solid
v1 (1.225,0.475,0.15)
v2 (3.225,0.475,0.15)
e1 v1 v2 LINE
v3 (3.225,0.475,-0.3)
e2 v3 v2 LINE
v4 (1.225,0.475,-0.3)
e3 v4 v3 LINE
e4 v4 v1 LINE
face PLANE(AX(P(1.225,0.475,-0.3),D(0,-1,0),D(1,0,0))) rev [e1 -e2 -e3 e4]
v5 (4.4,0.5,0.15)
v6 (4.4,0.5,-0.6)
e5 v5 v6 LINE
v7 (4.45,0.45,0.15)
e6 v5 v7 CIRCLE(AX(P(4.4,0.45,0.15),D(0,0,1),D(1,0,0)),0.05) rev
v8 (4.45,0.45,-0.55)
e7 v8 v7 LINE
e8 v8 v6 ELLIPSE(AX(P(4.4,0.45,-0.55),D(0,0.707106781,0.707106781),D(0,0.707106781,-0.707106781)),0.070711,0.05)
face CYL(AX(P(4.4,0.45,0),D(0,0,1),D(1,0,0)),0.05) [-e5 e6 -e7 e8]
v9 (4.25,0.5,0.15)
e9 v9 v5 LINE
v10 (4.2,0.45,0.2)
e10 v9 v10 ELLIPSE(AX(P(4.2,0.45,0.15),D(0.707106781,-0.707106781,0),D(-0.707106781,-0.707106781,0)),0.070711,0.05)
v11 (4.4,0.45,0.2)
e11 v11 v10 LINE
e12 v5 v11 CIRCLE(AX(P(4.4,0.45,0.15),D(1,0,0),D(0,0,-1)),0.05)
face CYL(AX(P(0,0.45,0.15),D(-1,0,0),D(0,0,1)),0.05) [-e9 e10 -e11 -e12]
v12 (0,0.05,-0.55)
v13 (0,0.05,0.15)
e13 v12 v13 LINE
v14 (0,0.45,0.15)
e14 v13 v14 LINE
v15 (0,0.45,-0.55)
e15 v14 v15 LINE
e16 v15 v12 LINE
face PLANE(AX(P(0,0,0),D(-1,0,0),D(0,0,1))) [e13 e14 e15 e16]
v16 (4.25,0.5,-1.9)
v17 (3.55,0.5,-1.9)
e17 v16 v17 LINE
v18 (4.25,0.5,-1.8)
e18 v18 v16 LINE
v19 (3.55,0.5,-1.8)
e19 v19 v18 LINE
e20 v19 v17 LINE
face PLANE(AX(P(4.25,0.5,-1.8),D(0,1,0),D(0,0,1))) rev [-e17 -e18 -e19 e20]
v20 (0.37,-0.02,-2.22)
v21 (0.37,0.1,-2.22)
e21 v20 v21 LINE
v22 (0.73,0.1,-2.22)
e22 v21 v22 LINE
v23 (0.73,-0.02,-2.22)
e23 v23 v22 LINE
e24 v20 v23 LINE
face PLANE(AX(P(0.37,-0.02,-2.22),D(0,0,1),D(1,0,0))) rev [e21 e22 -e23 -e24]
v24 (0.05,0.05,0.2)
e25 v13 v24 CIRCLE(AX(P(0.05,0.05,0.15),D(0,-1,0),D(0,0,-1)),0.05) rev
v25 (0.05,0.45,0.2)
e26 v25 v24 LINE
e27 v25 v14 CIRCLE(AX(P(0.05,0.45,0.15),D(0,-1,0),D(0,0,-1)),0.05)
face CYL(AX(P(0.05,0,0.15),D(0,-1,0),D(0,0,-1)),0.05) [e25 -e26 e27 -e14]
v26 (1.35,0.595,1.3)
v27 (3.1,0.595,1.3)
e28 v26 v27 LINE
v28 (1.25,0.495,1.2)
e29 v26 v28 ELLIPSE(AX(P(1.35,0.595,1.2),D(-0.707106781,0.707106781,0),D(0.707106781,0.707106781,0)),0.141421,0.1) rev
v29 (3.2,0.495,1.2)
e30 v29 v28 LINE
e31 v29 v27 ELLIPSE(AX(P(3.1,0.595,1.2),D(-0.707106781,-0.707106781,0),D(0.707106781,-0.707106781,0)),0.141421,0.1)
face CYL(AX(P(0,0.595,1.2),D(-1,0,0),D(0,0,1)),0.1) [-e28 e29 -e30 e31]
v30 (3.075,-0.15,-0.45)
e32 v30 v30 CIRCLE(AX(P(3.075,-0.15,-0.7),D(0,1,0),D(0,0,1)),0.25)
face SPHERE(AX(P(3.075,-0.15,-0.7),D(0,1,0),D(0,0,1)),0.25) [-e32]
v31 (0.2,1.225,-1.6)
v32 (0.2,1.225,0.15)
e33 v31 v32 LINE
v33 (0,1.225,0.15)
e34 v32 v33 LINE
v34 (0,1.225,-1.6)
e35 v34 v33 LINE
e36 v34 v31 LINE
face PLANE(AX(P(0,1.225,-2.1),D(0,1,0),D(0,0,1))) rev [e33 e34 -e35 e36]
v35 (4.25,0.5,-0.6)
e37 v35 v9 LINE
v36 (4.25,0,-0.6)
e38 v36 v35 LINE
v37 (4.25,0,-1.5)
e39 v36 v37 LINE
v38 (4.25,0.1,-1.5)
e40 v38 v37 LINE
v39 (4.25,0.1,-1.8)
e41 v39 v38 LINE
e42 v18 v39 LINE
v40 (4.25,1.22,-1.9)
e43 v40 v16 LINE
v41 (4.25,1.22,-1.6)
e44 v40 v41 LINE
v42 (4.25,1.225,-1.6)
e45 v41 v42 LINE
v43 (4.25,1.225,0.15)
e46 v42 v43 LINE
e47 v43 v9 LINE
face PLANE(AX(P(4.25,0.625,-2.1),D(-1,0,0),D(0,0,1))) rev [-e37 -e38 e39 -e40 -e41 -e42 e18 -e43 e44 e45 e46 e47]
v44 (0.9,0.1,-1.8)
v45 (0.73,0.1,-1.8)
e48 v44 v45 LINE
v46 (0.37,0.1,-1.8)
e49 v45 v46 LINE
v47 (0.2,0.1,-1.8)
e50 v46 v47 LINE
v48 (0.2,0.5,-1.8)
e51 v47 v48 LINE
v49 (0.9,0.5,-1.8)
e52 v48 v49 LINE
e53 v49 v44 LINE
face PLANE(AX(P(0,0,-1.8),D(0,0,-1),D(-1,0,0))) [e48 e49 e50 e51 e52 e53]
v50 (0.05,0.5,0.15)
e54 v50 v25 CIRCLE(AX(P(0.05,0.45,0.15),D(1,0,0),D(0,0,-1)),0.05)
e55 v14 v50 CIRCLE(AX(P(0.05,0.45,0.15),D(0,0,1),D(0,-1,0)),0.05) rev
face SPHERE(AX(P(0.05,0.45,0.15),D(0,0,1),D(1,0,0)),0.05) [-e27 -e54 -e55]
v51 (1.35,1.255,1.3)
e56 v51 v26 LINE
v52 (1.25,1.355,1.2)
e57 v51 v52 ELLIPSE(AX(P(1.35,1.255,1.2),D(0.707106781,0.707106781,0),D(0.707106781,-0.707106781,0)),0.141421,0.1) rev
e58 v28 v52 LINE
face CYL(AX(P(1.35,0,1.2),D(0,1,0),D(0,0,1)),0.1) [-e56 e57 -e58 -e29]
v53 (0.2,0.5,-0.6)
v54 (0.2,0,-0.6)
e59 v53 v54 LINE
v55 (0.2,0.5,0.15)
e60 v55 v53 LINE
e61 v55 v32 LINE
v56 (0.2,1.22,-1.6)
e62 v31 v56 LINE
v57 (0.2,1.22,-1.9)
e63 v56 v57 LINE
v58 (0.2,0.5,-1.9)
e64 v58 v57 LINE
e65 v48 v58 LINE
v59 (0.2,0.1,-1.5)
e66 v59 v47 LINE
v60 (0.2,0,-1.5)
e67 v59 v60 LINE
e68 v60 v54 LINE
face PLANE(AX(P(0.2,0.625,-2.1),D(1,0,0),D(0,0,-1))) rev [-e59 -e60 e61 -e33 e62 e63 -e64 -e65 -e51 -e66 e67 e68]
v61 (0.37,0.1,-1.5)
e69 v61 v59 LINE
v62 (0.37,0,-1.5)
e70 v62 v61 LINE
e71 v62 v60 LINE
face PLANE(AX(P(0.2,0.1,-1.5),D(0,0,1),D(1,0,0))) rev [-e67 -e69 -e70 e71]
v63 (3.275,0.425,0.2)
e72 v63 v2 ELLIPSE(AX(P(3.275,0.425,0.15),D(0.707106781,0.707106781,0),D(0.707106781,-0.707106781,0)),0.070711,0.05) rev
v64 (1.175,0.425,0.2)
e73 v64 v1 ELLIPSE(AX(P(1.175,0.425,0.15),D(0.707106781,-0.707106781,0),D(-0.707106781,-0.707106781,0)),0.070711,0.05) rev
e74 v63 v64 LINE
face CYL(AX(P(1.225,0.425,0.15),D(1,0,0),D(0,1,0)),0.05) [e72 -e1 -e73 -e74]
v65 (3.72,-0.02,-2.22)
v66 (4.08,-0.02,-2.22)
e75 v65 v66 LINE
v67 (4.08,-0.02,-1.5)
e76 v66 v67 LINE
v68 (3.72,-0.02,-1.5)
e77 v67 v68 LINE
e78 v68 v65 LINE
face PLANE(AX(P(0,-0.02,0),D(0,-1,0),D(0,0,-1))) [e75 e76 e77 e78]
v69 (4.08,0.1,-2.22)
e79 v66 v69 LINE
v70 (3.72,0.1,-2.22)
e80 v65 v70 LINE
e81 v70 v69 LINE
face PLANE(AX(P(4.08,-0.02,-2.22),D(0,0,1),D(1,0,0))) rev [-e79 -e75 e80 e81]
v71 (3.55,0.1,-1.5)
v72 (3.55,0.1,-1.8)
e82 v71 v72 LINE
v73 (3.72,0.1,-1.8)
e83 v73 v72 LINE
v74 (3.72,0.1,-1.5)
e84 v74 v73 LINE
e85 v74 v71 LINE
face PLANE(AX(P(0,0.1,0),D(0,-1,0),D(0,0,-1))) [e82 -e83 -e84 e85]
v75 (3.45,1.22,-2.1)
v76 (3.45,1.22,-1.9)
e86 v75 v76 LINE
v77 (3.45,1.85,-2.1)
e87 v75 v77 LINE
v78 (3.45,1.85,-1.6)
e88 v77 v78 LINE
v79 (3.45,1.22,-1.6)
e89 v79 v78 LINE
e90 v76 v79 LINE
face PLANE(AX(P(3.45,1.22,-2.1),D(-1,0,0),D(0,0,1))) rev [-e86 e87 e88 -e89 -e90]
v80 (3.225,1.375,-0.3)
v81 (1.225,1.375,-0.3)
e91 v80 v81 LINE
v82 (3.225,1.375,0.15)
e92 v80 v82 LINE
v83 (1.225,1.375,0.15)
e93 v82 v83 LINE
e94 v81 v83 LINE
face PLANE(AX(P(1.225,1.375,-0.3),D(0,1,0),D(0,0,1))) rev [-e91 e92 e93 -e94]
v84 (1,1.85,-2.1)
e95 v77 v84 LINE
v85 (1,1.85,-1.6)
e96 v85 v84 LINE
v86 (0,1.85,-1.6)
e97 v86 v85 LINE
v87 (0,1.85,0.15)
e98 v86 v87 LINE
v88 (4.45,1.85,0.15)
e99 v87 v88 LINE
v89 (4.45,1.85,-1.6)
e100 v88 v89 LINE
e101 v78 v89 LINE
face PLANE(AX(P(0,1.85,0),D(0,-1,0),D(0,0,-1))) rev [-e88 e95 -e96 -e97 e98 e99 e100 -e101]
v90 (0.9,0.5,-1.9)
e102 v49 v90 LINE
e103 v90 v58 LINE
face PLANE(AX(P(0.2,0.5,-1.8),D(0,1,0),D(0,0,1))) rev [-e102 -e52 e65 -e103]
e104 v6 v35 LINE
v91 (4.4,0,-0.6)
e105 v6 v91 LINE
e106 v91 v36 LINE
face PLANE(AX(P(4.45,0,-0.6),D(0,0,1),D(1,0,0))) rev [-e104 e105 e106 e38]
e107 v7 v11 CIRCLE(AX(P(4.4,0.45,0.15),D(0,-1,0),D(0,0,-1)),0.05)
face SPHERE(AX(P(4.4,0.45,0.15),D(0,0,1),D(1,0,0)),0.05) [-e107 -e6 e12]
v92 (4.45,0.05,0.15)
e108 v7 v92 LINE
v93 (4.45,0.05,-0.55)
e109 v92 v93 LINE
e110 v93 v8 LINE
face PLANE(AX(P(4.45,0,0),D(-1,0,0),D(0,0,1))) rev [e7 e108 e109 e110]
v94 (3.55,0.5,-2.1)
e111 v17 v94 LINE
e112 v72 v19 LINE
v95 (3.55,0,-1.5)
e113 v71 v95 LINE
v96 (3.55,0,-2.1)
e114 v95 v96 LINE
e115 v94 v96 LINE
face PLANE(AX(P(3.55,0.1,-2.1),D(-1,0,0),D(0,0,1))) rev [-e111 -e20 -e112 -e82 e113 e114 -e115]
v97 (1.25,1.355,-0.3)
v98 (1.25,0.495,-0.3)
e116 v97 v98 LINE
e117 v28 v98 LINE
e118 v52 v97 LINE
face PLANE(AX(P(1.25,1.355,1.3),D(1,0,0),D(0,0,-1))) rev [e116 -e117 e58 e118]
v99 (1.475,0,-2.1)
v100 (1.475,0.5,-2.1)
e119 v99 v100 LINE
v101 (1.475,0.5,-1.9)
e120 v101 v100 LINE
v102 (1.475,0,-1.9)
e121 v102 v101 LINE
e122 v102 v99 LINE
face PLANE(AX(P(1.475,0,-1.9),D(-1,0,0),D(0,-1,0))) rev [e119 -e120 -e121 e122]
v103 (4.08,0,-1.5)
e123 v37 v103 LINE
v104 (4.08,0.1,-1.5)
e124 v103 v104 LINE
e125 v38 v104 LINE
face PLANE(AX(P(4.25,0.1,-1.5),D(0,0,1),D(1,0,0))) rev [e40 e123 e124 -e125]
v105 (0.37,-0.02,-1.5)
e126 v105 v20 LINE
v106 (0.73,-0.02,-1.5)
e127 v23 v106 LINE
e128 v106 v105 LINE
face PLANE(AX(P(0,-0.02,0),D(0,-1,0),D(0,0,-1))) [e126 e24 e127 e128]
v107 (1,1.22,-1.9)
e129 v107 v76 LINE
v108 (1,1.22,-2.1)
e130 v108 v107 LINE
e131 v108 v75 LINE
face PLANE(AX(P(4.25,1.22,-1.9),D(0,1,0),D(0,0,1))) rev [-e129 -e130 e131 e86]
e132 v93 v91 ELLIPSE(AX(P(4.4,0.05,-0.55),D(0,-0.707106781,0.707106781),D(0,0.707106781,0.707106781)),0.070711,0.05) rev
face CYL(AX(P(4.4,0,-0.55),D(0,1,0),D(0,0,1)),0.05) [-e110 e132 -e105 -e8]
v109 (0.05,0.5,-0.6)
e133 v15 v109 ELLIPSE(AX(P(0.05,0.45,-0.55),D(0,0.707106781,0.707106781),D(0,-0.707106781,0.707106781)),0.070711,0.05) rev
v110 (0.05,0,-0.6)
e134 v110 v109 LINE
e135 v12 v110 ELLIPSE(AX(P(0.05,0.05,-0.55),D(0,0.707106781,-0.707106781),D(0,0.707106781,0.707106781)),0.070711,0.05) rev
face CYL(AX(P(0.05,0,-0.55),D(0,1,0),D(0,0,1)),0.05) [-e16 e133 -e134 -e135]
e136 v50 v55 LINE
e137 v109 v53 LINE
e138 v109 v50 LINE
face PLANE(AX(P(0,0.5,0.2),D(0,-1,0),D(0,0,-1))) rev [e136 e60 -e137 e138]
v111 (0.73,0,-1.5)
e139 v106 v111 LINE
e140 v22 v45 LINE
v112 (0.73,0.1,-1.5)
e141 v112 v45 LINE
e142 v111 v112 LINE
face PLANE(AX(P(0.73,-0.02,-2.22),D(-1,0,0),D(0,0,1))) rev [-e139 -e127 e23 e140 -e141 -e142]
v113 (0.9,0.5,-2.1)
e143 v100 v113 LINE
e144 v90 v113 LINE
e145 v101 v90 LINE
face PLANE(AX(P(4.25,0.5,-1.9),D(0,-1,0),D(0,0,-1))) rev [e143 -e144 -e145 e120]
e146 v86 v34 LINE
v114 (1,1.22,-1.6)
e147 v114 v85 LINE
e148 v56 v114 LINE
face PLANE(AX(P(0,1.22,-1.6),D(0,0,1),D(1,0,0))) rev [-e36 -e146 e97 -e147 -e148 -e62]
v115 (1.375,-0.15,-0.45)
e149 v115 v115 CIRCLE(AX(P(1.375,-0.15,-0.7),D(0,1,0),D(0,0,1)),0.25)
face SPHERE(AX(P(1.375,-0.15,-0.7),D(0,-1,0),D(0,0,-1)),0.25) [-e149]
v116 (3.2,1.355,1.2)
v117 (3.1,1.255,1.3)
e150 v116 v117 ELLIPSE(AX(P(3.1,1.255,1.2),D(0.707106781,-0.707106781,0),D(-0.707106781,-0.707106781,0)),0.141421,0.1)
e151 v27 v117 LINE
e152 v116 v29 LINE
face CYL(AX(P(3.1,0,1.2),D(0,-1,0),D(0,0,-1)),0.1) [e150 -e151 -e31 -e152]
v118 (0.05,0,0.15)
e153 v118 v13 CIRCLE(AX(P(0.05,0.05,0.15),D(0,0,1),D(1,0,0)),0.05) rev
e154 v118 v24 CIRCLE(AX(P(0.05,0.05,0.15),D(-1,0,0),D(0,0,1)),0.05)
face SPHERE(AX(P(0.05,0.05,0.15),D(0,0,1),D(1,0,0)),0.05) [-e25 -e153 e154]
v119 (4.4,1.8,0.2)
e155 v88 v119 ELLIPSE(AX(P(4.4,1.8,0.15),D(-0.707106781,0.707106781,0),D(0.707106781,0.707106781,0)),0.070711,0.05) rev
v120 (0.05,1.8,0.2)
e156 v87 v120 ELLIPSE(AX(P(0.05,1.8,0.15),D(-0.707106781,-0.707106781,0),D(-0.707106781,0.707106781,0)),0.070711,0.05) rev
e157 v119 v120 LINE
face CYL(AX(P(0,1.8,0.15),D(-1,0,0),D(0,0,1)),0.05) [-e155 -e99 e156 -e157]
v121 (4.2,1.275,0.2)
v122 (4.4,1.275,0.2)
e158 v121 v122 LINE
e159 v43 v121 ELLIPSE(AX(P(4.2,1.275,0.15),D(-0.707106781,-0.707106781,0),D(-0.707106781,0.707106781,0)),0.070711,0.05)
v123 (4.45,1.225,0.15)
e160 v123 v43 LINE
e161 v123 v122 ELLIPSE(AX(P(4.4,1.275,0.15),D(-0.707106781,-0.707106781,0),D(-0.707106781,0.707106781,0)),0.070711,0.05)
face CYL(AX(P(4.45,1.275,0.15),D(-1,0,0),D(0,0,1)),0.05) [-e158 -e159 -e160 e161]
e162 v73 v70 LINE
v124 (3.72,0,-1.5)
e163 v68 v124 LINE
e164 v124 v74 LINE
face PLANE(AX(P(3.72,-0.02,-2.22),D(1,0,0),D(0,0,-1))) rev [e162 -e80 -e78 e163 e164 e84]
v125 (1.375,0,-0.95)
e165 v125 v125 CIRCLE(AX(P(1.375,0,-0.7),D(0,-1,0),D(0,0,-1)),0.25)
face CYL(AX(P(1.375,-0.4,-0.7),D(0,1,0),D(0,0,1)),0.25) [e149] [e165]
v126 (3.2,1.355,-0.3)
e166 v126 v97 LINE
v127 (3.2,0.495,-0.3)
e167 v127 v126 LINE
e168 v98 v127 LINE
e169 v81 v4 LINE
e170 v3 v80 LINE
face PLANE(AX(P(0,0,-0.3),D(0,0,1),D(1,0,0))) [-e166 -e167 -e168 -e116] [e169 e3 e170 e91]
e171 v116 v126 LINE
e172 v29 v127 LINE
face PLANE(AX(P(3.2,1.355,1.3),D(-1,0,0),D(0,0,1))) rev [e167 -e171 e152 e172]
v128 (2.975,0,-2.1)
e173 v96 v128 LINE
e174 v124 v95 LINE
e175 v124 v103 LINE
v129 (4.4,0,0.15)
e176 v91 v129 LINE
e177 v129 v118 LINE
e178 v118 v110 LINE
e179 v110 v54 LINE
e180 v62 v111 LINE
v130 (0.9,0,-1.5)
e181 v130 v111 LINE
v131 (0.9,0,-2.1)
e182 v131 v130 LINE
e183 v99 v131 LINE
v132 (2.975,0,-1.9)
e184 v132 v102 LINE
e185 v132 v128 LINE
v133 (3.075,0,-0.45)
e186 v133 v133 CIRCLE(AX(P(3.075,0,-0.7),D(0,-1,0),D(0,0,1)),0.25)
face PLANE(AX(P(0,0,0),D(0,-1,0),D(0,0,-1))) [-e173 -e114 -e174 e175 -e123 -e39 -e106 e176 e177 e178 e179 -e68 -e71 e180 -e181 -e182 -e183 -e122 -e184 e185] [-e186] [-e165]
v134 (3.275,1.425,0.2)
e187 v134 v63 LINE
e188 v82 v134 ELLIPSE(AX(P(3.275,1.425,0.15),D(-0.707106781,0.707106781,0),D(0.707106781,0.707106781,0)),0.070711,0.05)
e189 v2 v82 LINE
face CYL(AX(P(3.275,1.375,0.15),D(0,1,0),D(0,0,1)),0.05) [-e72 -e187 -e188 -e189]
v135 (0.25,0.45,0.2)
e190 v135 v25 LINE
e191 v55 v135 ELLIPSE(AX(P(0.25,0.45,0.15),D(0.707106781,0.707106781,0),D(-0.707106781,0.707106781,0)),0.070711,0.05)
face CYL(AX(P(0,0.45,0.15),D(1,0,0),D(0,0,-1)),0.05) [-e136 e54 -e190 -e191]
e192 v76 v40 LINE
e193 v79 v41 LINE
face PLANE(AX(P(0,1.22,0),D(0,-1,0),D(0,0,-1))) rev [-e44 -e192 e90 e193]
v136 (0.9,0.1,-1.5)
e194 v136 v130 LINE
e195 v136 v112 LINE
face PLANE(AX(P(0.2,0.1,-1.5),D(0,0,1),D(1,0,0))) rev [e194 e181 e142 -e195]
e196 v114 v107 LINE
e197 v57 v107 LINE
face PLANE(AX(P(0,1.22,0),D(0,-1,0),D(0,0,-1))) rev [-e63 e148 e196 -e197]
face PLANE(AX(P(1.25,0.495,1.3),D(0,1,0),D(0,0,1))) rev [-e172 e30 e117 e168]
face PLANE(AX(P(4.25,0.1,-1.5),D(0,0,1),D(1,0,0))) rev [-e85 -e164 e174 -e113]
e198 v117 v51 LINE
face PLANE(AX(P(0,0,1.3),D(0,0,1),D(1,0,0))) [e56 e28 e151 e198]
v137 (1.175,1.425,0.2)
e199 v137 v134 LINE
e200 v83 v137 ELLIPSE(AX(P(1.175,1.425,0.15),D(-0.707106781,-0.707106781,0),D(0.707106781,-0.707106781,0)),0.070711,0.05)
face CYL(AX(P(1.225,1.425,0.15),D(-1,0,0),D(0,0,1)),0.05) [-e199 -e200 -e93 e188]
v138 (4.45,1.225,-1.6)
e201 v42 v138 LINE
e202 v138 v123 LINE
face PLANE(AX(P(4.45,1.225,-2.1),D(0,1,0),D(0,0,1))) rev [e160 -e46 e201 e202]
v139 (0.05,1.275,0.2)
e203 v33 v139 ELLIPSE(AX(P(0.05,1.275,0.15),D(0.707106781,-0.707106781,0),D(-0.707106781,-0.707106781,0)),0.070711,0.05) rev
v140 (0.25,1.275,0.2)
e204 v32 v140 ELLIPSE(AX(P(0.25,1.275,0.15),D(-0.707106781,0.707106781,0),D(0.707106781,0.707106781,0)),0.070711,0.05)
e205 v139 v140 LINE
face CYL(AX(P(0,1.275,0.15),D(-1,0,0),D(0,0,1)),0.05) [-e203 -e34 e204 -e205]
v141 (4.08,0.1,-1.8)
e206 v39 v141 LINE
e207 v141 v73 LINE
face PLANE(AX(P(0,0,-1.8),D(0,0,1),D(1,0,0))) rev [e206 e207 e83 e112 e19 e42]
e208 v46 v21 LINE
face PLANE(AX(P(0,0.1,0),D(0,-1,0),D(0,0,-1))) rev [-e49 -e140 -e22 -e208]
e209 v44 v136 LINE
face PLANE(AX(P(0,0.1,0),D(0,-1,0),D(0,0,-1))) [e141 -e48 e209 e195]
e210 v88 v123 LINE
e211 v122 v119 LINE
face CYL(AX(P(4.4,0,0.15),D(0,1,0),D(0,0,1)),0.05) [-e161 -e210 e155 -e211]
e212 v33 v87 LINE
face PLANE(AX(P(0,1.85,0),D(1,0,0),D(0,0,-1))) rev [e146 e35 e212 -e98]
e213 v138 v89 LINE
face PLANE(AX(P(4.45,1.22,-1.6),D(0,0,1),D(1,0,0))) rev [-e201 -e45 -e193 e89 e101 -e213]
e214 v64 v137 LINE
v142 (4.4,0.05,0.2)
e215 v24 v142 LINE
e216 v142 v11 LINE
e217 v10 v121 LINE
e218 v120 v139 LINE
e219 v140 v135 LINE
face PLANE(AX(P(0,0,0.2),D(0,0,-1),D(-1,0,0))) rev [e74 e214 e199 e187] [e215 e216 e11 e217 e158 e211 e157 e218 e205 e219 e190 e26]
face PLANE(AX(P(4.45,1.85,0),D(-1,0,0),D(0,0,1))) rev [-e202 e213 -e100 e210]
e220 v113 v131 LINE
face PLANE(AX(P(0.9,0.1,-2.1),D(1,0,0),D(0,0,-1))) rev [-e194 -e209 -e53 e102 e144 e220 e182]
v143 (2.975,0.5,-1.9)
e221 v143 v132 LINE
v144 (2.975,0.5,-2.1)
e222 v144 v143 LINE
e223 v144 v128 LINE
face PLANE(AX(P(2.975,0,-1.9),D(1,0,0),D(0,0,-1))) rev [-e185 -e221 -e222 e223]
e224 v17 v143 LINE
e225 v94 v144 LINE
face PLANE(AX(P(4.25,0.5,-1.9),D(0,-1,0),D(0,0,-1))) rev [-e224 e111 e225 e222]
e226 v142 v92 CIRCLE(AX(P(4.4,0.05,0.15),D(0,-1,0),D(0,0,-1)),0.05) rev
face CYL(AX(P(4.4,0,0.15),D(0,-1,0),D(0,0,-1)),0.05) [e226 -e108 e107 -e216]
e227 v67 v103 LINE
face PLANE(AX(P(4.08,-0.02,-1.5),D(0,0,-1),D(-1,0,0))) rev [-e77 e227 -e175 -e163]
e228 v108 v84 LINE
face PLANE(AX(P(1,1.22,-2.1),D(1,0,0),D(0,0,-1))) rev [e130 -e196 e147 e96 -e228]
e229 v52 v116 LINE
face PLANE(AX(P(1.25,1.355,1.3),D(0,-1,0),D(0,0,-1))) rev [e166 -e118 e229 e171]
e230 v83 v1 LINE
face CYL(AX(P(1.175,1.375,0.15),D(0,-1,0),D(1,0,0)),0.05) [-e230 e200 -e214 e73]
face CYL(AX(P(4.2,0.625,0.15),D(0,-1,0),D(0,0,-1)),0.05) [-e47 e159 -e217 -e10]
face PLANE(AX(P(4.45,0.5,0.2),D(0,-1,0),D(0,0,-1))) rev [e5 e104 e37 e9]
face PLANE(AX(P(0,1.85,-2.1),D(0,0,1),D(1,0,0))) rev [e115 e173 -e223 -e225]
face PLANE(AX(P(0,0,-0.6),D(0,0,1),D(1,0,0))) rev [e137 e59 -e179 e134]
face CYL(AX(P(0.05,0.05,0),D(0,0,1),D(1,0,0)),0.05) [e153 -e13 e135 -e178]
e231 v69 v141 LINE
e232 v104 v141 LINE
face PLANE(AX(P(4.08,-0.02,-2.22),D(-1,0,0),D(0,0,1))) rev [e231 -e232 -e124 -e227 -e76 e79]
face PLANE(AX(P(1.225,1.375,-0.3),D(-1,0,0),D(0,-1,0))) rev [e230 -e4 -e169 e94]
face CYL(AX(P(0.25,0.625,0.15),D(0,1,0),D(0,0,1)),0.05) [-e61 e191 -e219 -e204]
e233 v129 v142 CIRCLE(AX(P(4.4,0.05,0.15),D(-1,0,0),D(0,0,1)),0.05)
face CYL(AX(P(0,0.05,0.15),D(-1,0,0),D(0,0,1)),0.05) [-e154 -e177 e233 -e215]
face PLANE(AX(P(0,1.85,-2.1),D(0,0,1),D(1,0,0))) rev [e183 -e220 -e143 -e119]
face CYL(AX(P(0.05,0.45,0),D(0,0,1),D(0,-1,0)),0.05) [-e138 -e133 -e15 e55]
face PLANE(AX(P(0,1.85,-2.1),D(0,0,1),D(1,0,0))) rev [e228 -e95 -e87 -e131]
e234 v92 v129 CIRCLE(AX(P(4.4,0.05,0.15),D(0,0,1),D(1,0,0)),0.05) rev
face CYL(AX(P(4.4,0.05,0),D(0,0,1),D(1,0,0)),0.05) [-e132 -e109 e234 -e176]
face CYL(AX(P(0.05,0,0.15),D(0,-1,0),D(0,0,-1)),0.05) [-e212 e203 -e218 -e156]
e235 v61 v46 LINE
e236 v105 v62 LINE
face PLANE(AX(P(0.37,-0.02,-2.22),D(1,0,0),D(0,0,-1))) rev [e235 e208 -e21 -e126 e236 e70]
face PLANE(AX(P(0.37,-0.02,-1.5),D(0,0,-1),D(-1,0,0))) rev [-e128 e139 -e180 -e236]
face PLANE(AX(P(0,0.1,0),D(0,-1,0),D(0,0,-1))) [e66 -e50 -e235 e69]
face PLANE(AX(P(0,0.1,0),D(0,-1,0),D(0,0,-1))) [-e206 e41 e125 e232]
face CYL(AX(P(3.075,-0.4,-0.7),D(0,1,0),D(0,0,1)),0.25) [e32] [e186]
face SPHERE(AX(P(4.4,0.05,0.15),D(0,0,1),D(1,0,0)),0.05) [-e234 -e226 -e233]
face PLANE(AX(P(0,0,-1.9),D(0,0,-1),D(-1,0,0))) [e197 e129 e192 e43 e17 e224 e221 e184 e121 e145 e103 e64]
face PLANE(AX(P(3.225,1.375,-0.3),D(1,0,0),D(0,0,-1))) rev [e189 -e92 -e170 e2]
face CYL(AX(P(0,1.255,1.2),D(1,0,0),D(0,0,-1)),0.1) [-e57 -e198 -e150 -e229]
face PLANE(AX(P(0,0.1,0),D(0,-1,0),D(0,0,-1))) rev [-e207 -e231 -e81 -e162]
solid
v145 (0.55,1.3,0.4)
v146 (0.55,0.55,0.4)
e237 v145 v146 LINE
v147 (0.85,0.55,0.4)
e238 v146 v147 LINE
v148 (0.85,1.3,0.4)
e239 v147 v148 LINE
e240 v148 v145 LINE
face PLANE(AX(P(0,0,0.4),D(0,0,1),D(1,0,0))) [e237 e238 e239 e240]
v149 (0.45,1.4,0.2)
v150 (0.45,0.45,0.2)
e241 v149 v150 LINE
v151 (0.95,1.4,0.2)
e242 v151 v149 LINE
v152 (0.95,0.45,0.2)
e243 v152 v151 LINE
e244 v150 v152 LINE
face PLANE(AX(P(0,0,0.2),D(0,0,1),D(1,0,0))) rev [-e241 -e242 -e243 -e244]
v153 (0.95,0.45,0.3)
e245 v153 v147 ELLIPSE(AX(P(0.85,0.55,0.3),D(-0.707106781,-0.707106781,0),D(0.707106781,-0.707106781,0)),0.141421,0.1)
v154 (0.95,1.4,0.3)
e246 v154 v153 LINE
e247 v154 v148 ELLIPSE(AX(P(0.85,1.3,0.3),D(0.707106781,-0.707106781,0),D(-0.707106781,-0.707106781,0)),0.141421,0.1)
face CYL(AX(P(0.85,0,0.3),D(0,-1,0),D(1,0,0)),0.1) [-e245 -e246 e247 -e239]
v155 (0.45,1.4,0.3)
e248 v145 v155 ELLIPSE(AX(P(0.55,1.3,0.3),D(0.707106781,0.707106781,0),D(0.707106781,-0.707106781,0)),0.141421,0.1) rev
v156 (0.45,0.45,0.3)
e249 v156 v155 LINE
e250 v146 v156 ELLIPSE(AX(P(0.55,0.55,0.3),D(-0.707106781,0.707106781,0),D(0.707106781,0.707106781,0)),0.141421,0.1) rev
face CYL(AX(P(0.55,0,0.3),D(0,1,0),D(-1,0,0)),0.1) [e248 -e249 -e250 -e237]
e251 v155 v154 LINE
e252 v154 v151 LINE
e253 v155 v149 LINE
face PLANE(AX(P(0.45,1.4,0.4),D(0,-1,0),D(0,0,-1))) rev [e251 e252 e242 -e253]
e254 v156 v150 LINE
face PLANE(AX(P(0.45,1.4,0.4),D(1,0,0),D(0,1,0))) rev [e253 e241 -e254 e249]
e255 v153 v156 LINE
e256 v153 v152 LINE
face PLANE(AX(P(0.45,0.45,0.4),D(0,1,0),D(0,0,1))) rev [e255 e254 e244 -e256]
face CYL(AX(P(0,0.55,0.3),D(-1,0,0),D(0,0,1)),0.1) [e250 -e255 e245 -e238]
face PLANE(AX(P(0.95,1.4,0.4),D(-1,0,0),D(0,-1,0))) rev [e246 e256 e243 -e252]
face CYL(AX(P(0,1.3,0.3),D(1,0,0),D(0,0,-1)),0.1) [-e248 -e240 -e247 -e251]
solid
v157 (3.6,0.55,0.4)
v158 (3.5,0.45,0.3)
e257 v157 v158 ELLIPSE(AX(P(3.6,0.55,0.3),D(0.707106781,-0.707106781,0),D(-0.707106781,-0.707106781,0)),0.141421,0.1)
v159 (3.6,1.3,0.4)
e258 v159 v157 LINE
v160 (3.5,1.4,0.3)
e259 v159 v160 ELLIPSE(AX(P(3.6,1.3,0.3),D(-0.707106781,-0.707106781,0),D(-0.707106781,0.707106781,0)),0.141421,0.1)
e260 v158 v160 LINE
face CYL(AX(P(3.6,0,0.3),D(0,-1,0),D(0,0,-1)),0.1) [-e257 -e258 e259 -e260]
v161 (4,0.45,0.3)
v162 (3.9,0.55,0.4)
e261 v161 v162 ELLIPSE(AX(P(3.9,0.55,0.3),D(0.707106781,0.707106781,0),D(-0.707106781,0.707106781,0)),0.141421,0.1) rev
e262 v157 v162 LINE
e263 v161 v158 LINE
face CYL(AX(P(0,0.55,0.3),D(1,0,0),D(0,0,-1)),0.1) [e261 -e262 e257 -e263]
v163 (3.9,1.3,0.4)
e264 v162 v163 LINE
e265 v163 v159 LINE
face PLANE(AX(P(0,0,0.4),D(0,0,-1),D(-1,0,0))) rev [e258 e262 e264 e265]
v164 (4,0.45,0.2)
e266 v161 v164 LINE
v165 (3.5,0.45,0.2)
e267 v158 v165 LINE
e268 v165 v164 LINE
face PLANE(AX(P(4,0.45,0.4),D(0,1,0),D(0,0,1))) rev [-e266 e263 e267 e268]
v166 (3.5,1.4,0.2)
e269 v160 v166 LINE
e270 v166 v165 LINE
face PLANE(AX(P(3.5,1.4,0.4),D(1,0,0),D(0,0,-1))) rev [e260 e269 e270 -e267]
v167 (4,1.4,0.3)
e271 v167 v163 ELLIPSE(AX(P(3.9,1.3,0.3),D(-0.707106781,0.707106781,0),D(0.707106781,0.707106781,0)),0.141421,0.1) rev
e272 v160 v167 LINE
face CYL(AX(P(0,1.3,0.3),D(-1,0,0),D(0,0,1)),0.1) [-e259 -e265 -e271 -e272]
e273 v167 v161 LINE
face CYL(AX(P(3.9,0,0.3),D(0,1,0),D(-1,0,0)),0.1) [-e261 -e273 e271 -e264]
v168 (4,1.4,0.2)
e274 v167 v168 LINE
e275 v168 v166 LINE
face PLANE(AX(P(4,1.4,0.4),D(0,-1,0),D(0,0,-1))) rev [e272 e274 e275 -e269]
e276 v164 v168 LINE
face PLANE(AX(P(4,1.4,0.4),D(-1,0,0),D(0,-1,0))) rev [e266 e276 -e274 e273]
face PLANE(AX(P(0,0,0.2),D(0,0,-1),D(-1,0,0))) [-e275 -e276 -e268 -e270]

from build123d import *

# Parameters (mm, degrees)
SKETCH_1_W           = 4.45
SKETCH_1_H           = 2.1
EXTRUDE_1_DEPTH      = 1.85
SKETCH_2_W           = 4.45
SKETCH_2_H           = 1.85
EXTRUDE_2_DEPTH      = 0.2
SKETCH_3_W           = 0.2
SKETCH_3_H           = 0.6
CUT_EXTRUDE_1_DEPTH  = 6.33994382
SKETCH_4_W           = 2
SKETCH_4_H           = 0.9
CUT_EXTRUDE_2_DEPTH  = 0.5
SKETCH_5_W           = 1.95
SKETCH_5_H           = 0.86
EXTRUDE_3_DEPTH      = 1.6
SKETCH_6_W           = 0.5
SKETCH_6_H           = 0.95
EXTRUDE_4_DEPTH      = 0.2
EXTRUDE_4_2_DEPTH    = 0.2
SKETCH_7_R           = 0.25
EXTRUDE_5_DEPTH      = 0.4
SKETCH_8_W           = 1
SKETCH_8_H           = 0.5
CUT_EXTRUDE_3_DEPTH  = 0.63
SKETCH_11_W          = 2.3
SKETCH_11_H          = 0.625
CUT_EXTRUDE_5_DEPTH  = 0.2
SKETCH_12_W          = 2.3
SKETCH_12_H          = 0.625
CUT_EXTRUDE_6_DEPTH  = 0.2
SKETCH_14_W          = 0.8
SKETCH_14_H          = 0.5
EXTRUDE_6_DEPTH      = 0.2
SKETCH_15_W          = 0.8
SKETCH_15_H          = 0.5
EXTRUDE_7_DEPTH      = 0.2
SKETCH_16_W          = 0.7
SKETCH_16_H          = 0.6
CUT_EXTRUDE_7_DEPTH  = 0.1
SKETCH_17_W          = 0.36
SKETCH_17_H          = 0.72
EXTRUDE_8_DEPTH      = 0.12
FILLET_1_R           = 0.25
FILLET_2_R           = 0.1
FILLET_3_R           = 0.1
FILLET_4_R           = 0.1
FILLET_5_R           = 0.05
FILLET_6_R           = 0.05
SKETCH_18_W          = 4.05
SKETCH_18_H          = 0.72
CUT_EXTRUDE_8_DEPTH  = 0.2
SKETCH_19_W          = 1.5
SKETCH_19_H          = 1.22
CUT_EXTRUDE_9_DEPTH  = 0.2
SKETCH_20_W          = 0.7
SKETCH_20_H          = 0.4
CUT_EXTRUDE_10_DEPTH = 0.3


with BuildPart() as part:
    # 草图1 → 凸台-拉伸1 (new body)
    with BuildSketch(Plane(origin=(0, 0, 0), x_dir=(1, 0, 0), z_dir=(0, 1, 0))):
        with Locations((2.225, 1.05)):
            Rectangle(SKETCH_1_W, SKETCH_1_H)
    extrude(amount=EXTRUDE_1_DEPTH)


with BuildPart() as body_2:
    # 草图2 → 凸台-拉伸2 (new body)
    with BuildSketch(Plane.XY):
        with Locations((2.225, 0.925)):
            Rectangle(SKETCH_2_W, SKETCH_2_H)
    extrude(amount=EXTRUDE_2_DEPTH)


with BuildPart() as cut_extrude_1_tool:
    # 草图3 → 切除-拉伸1 (new, through all)
    with BuildSketch(Plane.XY.offset(0.2)):
        with Locations((4.35, 0.925)):
            Rectangle(SKETCH_3_W, SKETCH_3_H)
        with Locations((0.1, 0.925)):
            Rectangle(SKETCH_3_W, SKETCH_3_H)
    extrude(amount=-CUT_EXTRUDE_1_DEPTH)


with BuildPart() as part_1:
    add(part.part)

    # 切除-拉伸1: cut by cut_extrude_1_tool
    add(cut_extrude_1_tool.part, mode=Mode.SUBTRACT)


with BuildPart() as body_2_1:
    add(body_2.part)

    # 切除-拉伸1: cut by cut_extrude_1_tool
    add(cut_extrude_1_tool.part, mode=Mode.SUBTRACT)


with BuildPart() as cut_extrude_2_tool:
    # 草图4 → 切除-拉伸2 (new body)
    with BuildSketch(Plane.XY.offset(0.2)):
        with Locations((2.225, 0.925)):
            Rectangle(SKETCH_4_W, SKETCH_4_H)
    extrude(amount=-CUT_EXTRUDE_2_DEPTH)


with BuildPart() as part_2:
    add(part_1.part)

    # 切除-拉伸2: cut by cut_extrude_2_tool
    add(cut_extrude_2_tool.part, mode=Mode.SUBTRACT)



with BuildPart() as body_2_2:
    add(body_2_1.part)

    # 切除-拉伸2: cut by cut_extrude_2_tool
    add(cut_extrude_2_tool.part, mode=Mode.SUBTRACT)


with BuildPart() as part_3:
    add(part_2.part)

    add(body_2_2.part)  # 凸台-拉伸3 merges body 2
    # 草图5 → 凸台-拉伸3 (add)
    with BuildSketch(Plane.XY.offset(-0.3)):
        with Locations((2.225, 0.925)):
            Rectangle(SKETCH_5_W, SKETCH_5_H)
    extrude(amount=EXTRUDE_3_DEPTH)

    # 草图7 → 凸台-拉伸5 (add)
    with BuildSketch(Plane.XZ):
        with Locations(Location((1.375, -0.7, 0), (0, 0, 270))):
            Circle(SKETCH_7_R)
        with Locations(Location((3.075, -0.7, 0), (0, 0, 90))):
            Circle(SKETCH_7_R)
    extrude(amount=EXTRUDE_5_DEPTH)

    # 草图8 → 切除-拉伸3 (cut)
    with BuildSketch(Plane(origin=(0, 1.85, 0), x_dir=(1, 0, 0), z_dir=(0, 1, 0))):
        with Locations((3.95, 1.85)):
            Rectangle(SKETCH_8_W, SKETCH_8_H)
        with Locations((0.5, 1.85)):
            Rectangle(SKETCH_8_W, SKETCH_8_H)
    extrude(amount=-CUT_EXTRUDE_3_DEPTH, mode=Mode.SUBTRACT)

    # 草图11 → 切除-拉伸5 (cut)
    with BuildSketch(Plane(origin=(4.45, 0, 0), x_dir=(0, 0, -1), z_dir=(1, 0, 0))):
        with Locations((0.95, 0.3125)):
            Rectangle(SKETCH_11_W, SKETCH_11_H)
    extrude(amount=-CUT_EXTRUDE_5_DEPTH, mode=Mode.SUBTRACT)

    # 草图12 → 切除-拉伸6 (cut)
    with BuildSketch(Plane.ZY):
        with Locations((-0.95, 0.3125)):
            Rectangle(SKETCH_12_W, SKETCH_12_H)
    extrude(amount=-CUT_EXTRUDE_6_DEPTH, mode=Mode.SUBTRACT)

    # 草图14 → 凸台-拉伸6 (add)
    with BuildSketch(Plane(origin=(4.25, 0, 0), x_dir=(0, 0, -1), z_dir=(1, 0, 0))):
        with Locations((0.2, 0.25)):
            Rectangle(SKETCH_14_W, SKETCH_14_H)
    extrude(amount=EXTRUDE_6_DEPTH)

    # 草图15 → 凸台-拉伸7 (add)
    with BuildSketch(Plane.ZY.offset(-0.2)):
        with Locations((-0.2, 0.25)):
            Rectangle(SKETCH_15_W, SKETCH_15_H)
    extrude(amount=EXTRUDE_7_DEPTH)

    # 草图16 → 切除-拉伸7 (cut)
    with BuildSketch(Plane.XZ):
        with Locations((0.55, -1.8)):
            Rectangle(SKETCH_16_W, SKETCH_16_H)
        with Locations((3.9, -1.8)):
            Rectangle(SKETCH_16_W, SKETCH_16_H)
    extrude(amount=-CUT_EXTRUDE_7_DEPTH, mode=Mode.SUBTRACT)

    # 草图17 → 凸台-拉伸8 (add)
    with BuildSketch(Plane.XZ.offset(-0.1)):
        with Locations((3.9, -1.86)):
            Rectangle(SKETCH_17_W, SKETCH_17_H)
        with Locations((0.55, -1.86)):
            Rectangle(SKETCH_17_W, SKETCH_17_H)
    extrude(amount=EXTRUDE_8_DEPTH)

    # 圆角1
    fillet_1_edges = [part_3.edges().sort_by_distance(p)[0] for p in [
        (1.375, -0.4, -0.45),
        (3.075, -0.4, -0.95),
    ]]
    fillet(fillet_1_edges, radius=FILLET_1_R)

    # 圆角4
    fillet_4_edges = [part_3.edges().sort_by_distance(p)[0] for p in [
        (3.2, 0.925, 1.3),
        (2.225, 1.355, 1.3),
        (1.25, 0.925, 1.3),
        (2.225, 0.495, 1.3),
    ]]
    fillet(fillet_4_edges, radius=FILLET_4_R)

    # 圆角5
    fillet_5_edges = [part_3.edges().sort_by_distance(p)[0] for p in [
        (4.45, 0.25, 0.2),
        (4.45, 0, -0.2),
        (4.45, 0.25, -0.6),
        (4.45, 0.5, -0.2),
        (0, 0.25, 0.2),
        (0, 0.5, -0.2),
        (0, 0.25, -0.6),
        (0, 0, -0.2),
    ]]
    fillet(fillet_5_edges, radius=FILLET_5_R)

    # 圆角6
    # the kernel refuses this fillet: 0.05 mm, written as the material it takes off along each edge
    with BuildSketch(Plane(origin=(0.05, 0.45, 0.15), x_dir=(0, 1, 0), z_dir=(0, 0, 1))) as fillet_6_piece_1_section:
        Polygon((0, 0), (FILLET_6_R, 0), (FILLET_6_R, FILLET_6_R), (0, FILLET_6_R), align=None)
    fillet_6_piece_1 = extrude(amount=FILLET_6_R, mode=Mode.PRIVATE)
    fillet_6_piece_1 = fillet_6_piece_1 - Plane(origin=(0.05, 0.45, 0.15), x_dir=(0.7071067811865475, -0.7071067811865475, 0), z_dir=(0, 0, 1)) * Sphere(FILLET_6_R, mode=Mode.PRIVATE)
    add(fillet_6_piece_1, mode=Mode.SUBTRACT)
    with BuildSketch(Plane(origin=(0.05, 0.05, 0.15), x_dir=(0, -1, 0), z_dir=(0, 0, 1))) as fillet_6_piece_2_section:
        Polygon((0, 0), (FILLET_6_R, 0), (FILLET_6_R, -FILLET_6_R), (0, -FILLET_6_R), align=None)
    fillet_6_piece_2 = extrude(amount=FILLET_6_R, mode=Mode.PRIVATE)
    fillet_6_piece_2 = fillet_6_piece_2 - Plane(origin=(0.05, 0.05, 0.15), x_dir=(0.7071067811865475, 0.7071067811865475, 0), z_dir=(0, 0, 1)) * Sphere(FILLET_6_R, mode=Mode.PRIVATE)
    add(fillet_6_piece_2, mode=Mode.SUBTRACT)
    with BuildSketch(Plane(origin=(4.4, 0.05, 0.15), x_dir=(0, -1, 0), z_dir=(0, 0, 1))) as fillet_6_piece_3_section:
        Polygon((0, 0), (FILLET_6_R, 0), (FILLET_6_R, FILLET_6_R), (0, FILLET_6_R), align=None)
    fillet_6_piece_3 = extrude(amount=FILLET_6_R, mode=Mode.PRIVATE)
    fillet_6_piece_3 = fillet_6_piece_3 - Plane(origin=(4.4, 0.05, 0.15), x_dir=(-0.7071067811865475, 0.7071067811865475, 0), z_dir=(0, 0, 1)) * Sphere(FILLET_6_R, mode=Mode.PRIVATE)
    add(fillet_6_piece_3, mode=Mode.SUBTRACT)
    with BuildSketch(Plane(origin=(4.4, 0.45, 0.15), x_dir=(0, 1, 0), z_dir=(0, 0, 1))) as fillet_6_piece_4_section:
        Polygon((0, 0), (FILLET_6_R, 0), (FILLET_6_R, -FILLET_6_R), (0, -FILLET_6_R), align=None)
    fillet_6_piece_4 = extrude(amount=FILLET_6_R, mode=Mode.PRIVATE)
    fillet_6_piece_4 = fillet_6_piece_4 - Plane(origin=(4.4, 0.45, 0.15), x_dir=(-0.7071067811865475, -0.7071067811865475, 0), z_dir=(0, 0, 1)) * Sphere(FILLET_6_R, mode=Mode.PRIVATE)
    add(fillet_6_piece_4, mode=Mode.SUBTRACT)
    with BuildSketch(Plane(origin=(0.2, 1.225, 0.2), x_dir=(1, 0, 0), z_dir=(0, -1, 0))) as fillet_6_piece_5:
        with BuildLine():
            CenterArc((FILLET_6_R, -FILLET_6_R), FILLET_6_R, 90, 90)
            Line((0, -FILLET_6_R), (0, 0))
            Line((0, 0), (FILLET_6_R, 0))
        make_face()
    extrude(amount=0.725, mode=Mode.SUBTRACT)
    with BuildSketch(Plane(origin=(4.4, 0, 0.2), x_dir=(0, 1, 0), z_dir=(-1, 0, 0))) as fillet_6_piece_6:
        with BuildLine():
            CenterArc((FILLET_6_R, FILLET_6_R), FILLET_6_R, 180, 90)
            Line((0, FILLET_6_R), (0, 0))
            Line((0, 0), (FILLET_6_R, 0))
        make_face()
    extrude(amount=4.35, mode=Mode.SUBTRACT)
    with BuildSketch(Plane(origin=(0.2, 0.5, 0.2), x_dir=(0, -1, 0), z_dir=(-1, 0, 0))) as fillet_6_piece_7:
        with BuildLine():
            CenterArc((FILLET_6_R, -FILLET_6_R), FILLET_6_R, 90, 90)
            Line((0, -FILLET_6_R), (0, 0))
            Line((0, 0), (FILLET_6_R, 0))
        make_face()
    extrude(amount=0.15, mode=Mode.SUBTRACT)
    with BuildSketch(Plane(origin=(4.25, 0.5, 0.2), x_dir=(0, -1, 0), z_dir=(1, 0, 0))) as fillet_6_piece_8:
        with BuildLine():
            CenterArc((FILLET_6_R, FILLET_6_R), FILLET_6_R, 180, 90)
            Line((0, FILLET_6_R), (0, 0))
            Line((0, 0), (FILLET_6_R, 0))
        make_face()
    extrude(amount=0.15, mode=Mode.SUBTRACT)
    with BuildSketch(Plane(origin=(0, 1.975, 0.2), x_dir=(1, 0, 0), z_dir=(0, -1, 0)), Plane(origin=(4.45, 1.1, 0.2), x_dir=(-1, 0, 0), z_dir=(0, 1, 0))) as fillet_6_piece_9:
        with BuildLine():
            CenterArc((FILLET_6_R, -FILLET_6_R), FILLET_6_R, 90, 90)
            Line((0, -FILLET_6_R), (0, 0))
            Line((0, 0), (FILLET_6_R, 0))
        make_face()
    extrude(amount=0.875, mode=Mode.SUBTRACT)
    with BuildSketch(Plane(origin=(4.575, 1.85, 0.2), x_dir=(0, -1, 0), z_dir=(-1, 0, 0))) as fillet_6_piece_10:
        with BuildLine():
            CenterArc((FILLET_6_R, -FILLET_6_R), FILLET_6_R, 90, 90)
            Line((0, -FILLET_6_R), (0, 0))
            Line((0, 0), (FILLET_6_R, 0))
        make_face()
    extrude(amount=4.7, mode=Mode.SUBTRACT)
    with BuildSketch(Plane(origin=(4.25, 1.225, 0.2), x_dir=(-1, 0, 0), z_dir=(0, -1, 0))) as fillet_6_piece_11:
        with BuildLine():
            CenterArc((FILLET_6_R, FILLET_6_R), FILLET_6_R, 180, 90)
            Line((0, FILLET_6_R), (0, 0))
            Line((0, 0), (FILLET_6_R, 0))
        make_face()
    extrude(amount=0.725, mode=Mode.SUBTRACT)
    with BuildSketch(Plane(origin=(4.25, 1.225, 0.2), x_dir=(0, 1, 0), z_dir=(1, 0, 0))) as fillet_6_piece_12:
        with BuildLine():
            CenterArc((FILLET_6_R, -FILLET_6_R), FILLET_6_R, 90, 90)
            Line((0, -FILLET_6_R), (0, 0))
            Line((0, 0), (FILLET_6_R, 0))
        make_face()
    extrude(amount=0.325, mode=Mode.SUBTRACT)
    with BuildSketch(Plane(origin=(0.2, 1.225, 0.2), x_dir=(0, 1, 0), z_dir=(-1, 0, 0))) as fillet_6_piece_13:
        with BuildLine():
            CenterArc((FILLET_6_R, FILLET_6_R), FILLET_6_R, 180, 90)
            Line((0, FILLET_6_R), (0, 0))
            Line((0, 0), (FILLET_6_R, 0))
        make_face()
    extrude(amount=0.325, mode=Mode.SUBTRACT)
    with BuildSketch(Plane(origin=(3.225, 1.375, 0.2), x_dir=(1, 0, 0), z_dir=(0, -1, 0)), Plane(origin=(1.225, 0.475, 0.2), x_dir=(-1, 0, 0), z_dir=(0, 1, 0))) as fillet_6_piece_14:
        with BuildLine():
            CenterArc((FILLET_6_R, -FILLET_6_R), FILLET_6_R, 90, 90)
            Line((0, -FILLET_6_R), (0, 0))
            Line((0, 0), (FILLET_6_R, 0))
        make_face()
    extrude(amount=0.9, mode=Mode.SUBTRACT)
    with BuildSketch(Plane(origin=(3.225, 0.475, 0.2), x_dir=(0, -1, 0), z_dir=(-1, 0, 0)), Plane(origin=(1.225, 1.375, 0.2), x_dir=(0, 1, 0), z_dir=(1, 0, 0))) as fillet_6_piece_15:
        with BuildLine():
            CenterArc((FILLET_6_R, -FILLET_6_R), FILLET_6_R, 90, 90)
            Line((0, -FILLET_6_R), (0, 0))
            Line((0, 0), (FILLET_6_R, 0))
        make_face()
    extrude(amount=2, mode=Mode.SUBTRACT)
    with BuildSketch(Plane(origin=(0.2, 1.35, 0.2), x_dir=(1, 0, 0), z_dir=(0, -1, 0))) as fillet_6_piece_16a_section:
        with BuildLine():
            CenterArc((FILLET_6_R, -FILLET_6_R), FILLET_6_R, 90, 90)
            Line((0, -FILLET_6_R), (0, 0))
            Line((0, 0), (FILLET_6_R, 0))
        make_face()
    fillet_6_piece_16a = extrude(amount=0.85, mode=Mode.PRIVATE)
    fillet_6_piece_16a = split(fillet_6_piece_16a, bisect_by=Plane(origin=(0.211319756, 1.225, 0.188680244), z_dir=(0, 1, 0)), keep=Keep.TOP, mode=Mode.PRIVATE)
    with BuildSketch(Plane(origin=(0.325, 1.225, 0.2), x_dir=(0, 1, 0), z_dir=(-1, 0, 0))) as fillet_6_piece_16b_section:
        with BuildLine():
            CenterArc((FILLET_6_R, FILLET_6_R), FILLET_6_R, 180, 90)
            Line((0, FILLET_6_R), (0, 0))
            Line((0, 0), (FILLET_6_R, 0))
        make_face()
    fillet_6_piece_16b = extrude(amount=0.45, mode=Mode.PRIVATE)
    fillet_6_piece_16b = split(fillet_6_piece_16b, bisect_by=Plane(origin=(0.2, 1.236319756, 0.188680244), z_dir=(1, 0, 0)), keep=Keep.TOP, mode=Mode.PRIVATE)
    fillet_6_piece_16 = fillet_6_piece_16a & fillet_6_piece_16b
    add(fillet_6_piece_16, mode=Mode.SUBTRACT)
    with BuildSketch(Plane(origin=(0.325, 0.5, 0.2), x_dir=(0, -1, 0), z_dir=(-1, 0, 0))) as fillet_6_piece_17a_section:
        with BuildLine():
            CenterArc((FILLET_6_R, -FILLET_6_R), FILLET_6_R, 90, 90)
            Line((0, -FILLET_6_R), (0, 0))
            Line((0, 0), (FILLET_6_R, 0))
        make_face()
    fillet_6_piece_17a = extrude(amount=0.275, mode=Mode.PRIVATE)
    fillet_6_piece_17a = split(fillet_6_piece_17a, bisect_by=Plane(origin=(0.2, 0.488680244, 0.188680244), z_dir=(1, 0, 0)), keep=Keep.TOP, mode=Mode.PRIVATE)
    with BuildSketch(Plane(origin=(0.2, 1.225, 0.2), x_dir=(1, 0, 0), z_dir=(0, -1, 0))) as fillet_6_piece_17b_section:
        with BuildLine():
            CenterArc((FILLET_6_R, -FILLET_6_R), FILLET_6_R, 90, 90)
            Line((0, -FILLET_6_R), (0, 0))
            Line((0, 0), (FILLET_6_R, 0))
        make_face()
    fillet_6_piece_17b = extrude(amount=0.85, mode=Mode.PRIVATE)
    fillet_6_piece_17b = split(fillet_6_piece_17b, bisect_by=Plane(origin=(0.211319756, 0.5, 0.188680244), z_dir=(0, -1, 0)), keep=Keep.TOP, mode=Mode.PRIVATE)
    fillet_6_piece_17 = fillet_6_piece_17a & fillet_6_piece_17b
    add(fillet_6_piece_17, mode=Mode.SUBTRACT)
    with BuildSketch(Plane(origin=(4.125, 0.5, 0.2), x_dir=(0, -1, 0), z_dir=(1, 0, 0))) as fillet_6_piece_18a_section:
        with BuildLine():
            CenterArc((FILLET_6_R, FILLET_6_R), FILLET_6_R, 180, 90)
            Line((0, FILLET_6_R), (0, 0))
            Line((0, 0), (FILLET_6_R, 0))
        make_face()
    fillet_6_piece_18a = extrude(amount=0.275, mode=Mode.PRIVATE)
    fillet_6_piece_18a = split(fillet_6_piece_18a, bisect_by=Plane(origin=(4.25, 0.488680244, 0.188680244), z_dir=(-1, 0, 0)), keep=Keep.TOP, mode=Mode.PRIVATE)
    with BuildSketch(Plane(origin=(4.25, 1.225, 0.2), x_dir=(-1, 0, 0), z_dir=(0, -1, 0))) as fillet_6_piece_18b_section:
        with BuildLine():
            CenterArc((FILLET_6_R, FILLET_6_R), FILLET_6_R, 180, 90)
            Line((0, FILLET_6_R), (0, 0))
            Line((0, 0), (FILLET_6_R, 0))
        make_face()
    fillet_6_piece_18b = extrude(amount=0.85, mode=Mode.PRIVATE)
    fillet_6_piece_18b = split(fillet_6_piece_18b, bisect_by=Plane(origin=(4.238680244, 0.5, 0.188680244), z_dir=(0, -1, 0)), keep=Keep.TOP, mode=Mode.PRIVATE)
    fillet_6_piece_18 = fillet_6_piece_18a & fillet_6_piece_18b
    add(fillet_6_piece_18, mode=Mode.SUBTRACT)
    with BuildSketch(Plane(origin=(4.25, 1.35, 0.2), x_dir=(-1, 0, 0), z_dir=(0, -1, 0))) as fillet_6_piece_19a_section:
        with BuildLine():
            CenterArc((FILLET_6_R, FILLET_6_R), FILLET_6_R, 180, 90)
            Line((0, FILLET_6_R), (0, 0))
            Line((0, 0), (FILLET_6_R, 0))
        make_face()
    fillet_6_piece_19a = extrude(amount=0.85, mode=Mode.PRIVATE)
    fillet_6_piece_19a = split(fillet_6_piece_19a, bisect_by=Plane(origin=(4.238680244, 1.225, 0.188680244), z_dir=(0, 1, 0)), keep=Keep.TOP, mode=Mode.PRIVATE)
    with BuildSketch(Plane(origin=(4.125, 1.225, 0.2), x_dir=(0, 1, 0), z_dir=(1, 0, 0))) as fillet_6_piece_19b_section:
        with BuildLine():
            CenterArc((FILLET_6_R, -FILLET_6_R), FILLET_6_R, 90, 90)
            Line((0, -FILLET_6_R), (0, 0))
            Line((0, 0), (FILLET_6_R, 0))
        make_face()
    fillet_6_piece_19b = extrude(amount=0.45, mode=Mode.PRIVATE)
    fillet_6_piece_19b = split(fillet_6_piece_19b, bisect_by=Plane(origin=(4.25, 1.236319756, 0.188680244), z_dir=(-1, 0, 0)), keep=Keep.TOP, mode=Mode.PRIVATE)
    fillet_6_piece_19 = fillet_6_piece_19a & fillet_6_piece_19b
    add(fillet_6_piece_19, mode=Mode.SUBTRACT)
    with BuildSketch(Plane(origin=(1.225, 1.375, 0.2), x_dir=(0, 1, 0), z_dir=(1, 0, 0))) as fillet_6_piece_20a_section:
        with BuildLine():
            CenterArc((FILLET_6_R, -FILLET_6_R), FILLET_6_R, 90, 90)
            Line((0, -FILLET_6_R), (0, 0))
            Line((0, 0), (FILLET_6_R, 0))
        make_face()
    fillet_6_piece_20a = extrude(amount=2.125, mode=Mode.PRIVATE)
    fillet_6_piece_20a = split(fillet_6_piece_20a, bisect_by=Plane(origin=(3.225, 1.386319756, 0.188680244), z_dir=(1, 0, 0)), keep=Keep.TOP, mode=Mode.PRIVATE)
    with BuildSketch(Plane(origin=(3.225, 1.5, 0.2), x_dir=(1, 0, 0), z_dir=(0, -1, 0))) as fillet_6_piece_20b_section:
        with BuildLine():
            CenterArc((FILLET_6_R, -FILLET_6_R), FILLET_6_R, 90, 90)
            Line((0, -FILLET_6_R), (0, 0))
            Line((0, 0), (FILLET_6_R, 0))
        make_face()
    fillet_6_piece_20b = extrude(amount=1.025, mode=Mode.PRIVATE)
    fillet_6_piece_20b = split(fillet_6_piece_20b, bisect_by=Plane(origin=(3.236319756, 1.375, 0.188680244), z_dir=(0, 1, 0)), keep=Keep.TOP, mode=Mode.PRIVATE)
    fillet_6_piece_20 = fillet_6_piece_20a & fillet_6_piece_20b
    add(fillet_6_piece_20, mode=Mode.SUBTRACT)
    with BuildSketch(Plane(origin=(3.225, 1.375, 0.2), x_dir=(1, 0, 0), z_dir=(0, -1, 0))) as fillet_6_piece_21a_section:
        with BuildLine():
            CenterArc((FILLET_6_R, -FILLET_6_R), FILLET_6_R, 90, 90)
            Line((0, -FILLET_6_R), (0, 0))
            Line((0, 0), (FILLET_6_R, 0))
        make_face()
    fillet_6_piece_21a = extrude(amount=1.025, mode=Mode.PRIVATE)
    fillet_6_piece_21a = split(fillet_6_piece_21a, bisect_by=Plane(origin=(3.236319756, 0.475, 0.188680244), z_dir=(0, -1, 0)), keep=Keep.TOP, mode=Mode.PRIVATE)
    with BuildSketch(Plane(origin=(3.35, 0.475, 0.2), x_dir=(0, -1, 0), z_dir=(-1, 0, 0))) as fillet_6_piece_21b_section:
        with BuildLine():
            CenterArc((FILLET_6_R, -FILLET_6_R), FILLET_6_R, 90, 90)
            Line((0, -FILLET_6_R), (0, 0))
            Line((0, 0), (FILLET_6_R, 0))
        make_face()
    fillet_6_piece_21b = extrude(amount=2.125, mode=Mode.PRIVATE)
    fillet_6_piece_21b = split(fillet_6_piece_21b, bisect_by=Plane(origin=(3.225, 0.463680244, 0.188680244), z_dir=(1, 0, 0)), keep=Keep.TOP, mode=Mode.PRIVATE)
    fillet_6_piece_21 = fillet_6_piece_21a & fillet_6_piece_21b
    add(fillet_6_piece_21, mode=Mode.SUBTRACT)
    with BuildSketch(Plane(origin=(1.225, 0.35, 0.2), x_dir=(-1, 0, 0), z_dir=(0, 1, 0))) as fillet_6_piece_22a_section:
        with BuildLine():
            CenterArc((FILLET_6_R, -FILLET_6_R), FILLET_6_R, 90, 90)
            Line((0, -FILLET_6_R), (0, 0))
            Line((0, 0), (FILLET_6_R, 0))
        make_face()
    fillet_6_piece_22a = extrude(amount=1.025, mode=Mode.PRIVATE)
    fillet_6_piece_22a = split(fillet_6_piece_22a, bisect_by=Plane(origin=(1.213680244, 0.475, 0.188680244), z_dir=(0, -1, 0)), keep=Keep.TOP, mode=Mode.PRIVATE)
    with BuildSketch(Plane(origin=(3.225, 0.475, 0.2), x_dir=(0, -1, 0), z_dir=(-1, 0, 0))) as fillet_6_piece_22b_section:
        with BuildLine():
            CenterArc((FILLET_6_R, -FILLET_6_R), FILLET_6_R, 90, 90)
            Line((0, -FILLET_6_R), (0, 0))
            Line((0, 0), (FILLET_6_R, 0))
        make_face()
    fillet_6_piece_22b = extrude(amount=2.125, mode=Mode.PRIVATE)
    fillet_6_piece_22b = split(fillet_6_piece_22b, bisect_by=Plane(origin=(1.225, 0.463680244, 0.188680244), z_dir=(-1, 0, 0)), keep=Keep.TOP, mode=Mode.PRIVATE)
    fillet_6_piece_22 = fillet_6_piece_22a & fillet_6_piece_22b
    add(fillet_6_piece_22, mode=Mode.SUBTRACT)
    with BuildSketch(Plane(origin=(1.225, 0.475, 0.2), x_dir=(-1, 0, 0), z_dir=(0, 1, 0))) as fillet_6_piece_23a_section:
        with BuildLine():
            CenterArc((FILLET_6_R, -FILLET_6_R), FILLET_6_R, 90, 90)
            Line((0, -FILLET_6_R), (0, 0))
            Line((0, 0), (FILLET_6_R, 0))
        make_face()
    fillet_6_piece_23a = extrude(amount=1.025, mode=Mode.PRIVATE)
    fillet_6_piece_23a = split(fillet_6_piece_23a, bisect_by=Plane(origin=(1.213680244, 1.375, 0.188680244), z_dir=(0, 1, 0)), keep=Keep.TOP, mode=Mode.PRIVATE)
    with BuildSketch(Plane(origin=(1.1, 1.375, 0.2), x_dir=(0, 1, 0), z_dir=(1, 0, 0))) as fillet_6_piece_23b_section:
        with BuildLine():
            CenterArc((FILLET_6_R, -FILLET_6_R), FILLET_6_R, 90, 90)
            Line((0, -FILLET_6_R), (0, 0))
            Line((0, 0), (FILLET_6_R, 0))
        make_face()
    fillet_6_piece_23b = extrude(amount=2.125, mode=Mode.PRIVATE)
    fillet_6_piece_23b = split(fillet_6_piece_23b, bisect_by=Plane(origin=(1.225, 1.386319756, 0.188680244), z_dir=(-1, 0, 0)), keep=Keep.TOP, mode=Mode.PRIVATE)
    fillet_6_piece_23 = fillet_6_piece_23a & fillet_6_piece_23b
    add(fillet_6_piece_23, mode=Mode.SUBTRACT)

    # 草图18 → 切除-拉伸8 (cut)
    with BuildSketch(Plane(origin=(0, 0, -2.1), x_dir=(-1, 0, 0), z_dir=(0, 0, -1))):
        with Locations((-2.225, 0.86)):
            Rectangle(SKETCH_18_W, SKETCH_18_H)
    extrude(amount=-CUT_EXTRUDE_8_DEPTH, mode=Mode.SUBTRACT)

    # 草图19 → 切除-拉伸9 (cut)
    with BuildSketch(Plane(origin=(0, 0, -2.1), x_dir=(-1, 0, 0), z_dir=(0, 0, -1))):
        with Locations((-2.225, 0.61)):
            Rectangle(SKETCH_19_W, SKETCH_19_H)
    extrude(amount=-CUT_EXTRUDE_9_DEPTH, mode=Mode.SUBTRACT)

    # 草图20 → 切除-拉伸10 (cut)
    with BuildSketch(Plane(origin=(0, 0, -2.1), x_dir=(-1, 0, 0), z_dir=(0, 0, -1))):
        with Locations((-3.9, 0.3)):
            Rectangle(SKETCH_20_W, SKETCH_20_H)
        with Locations((-0.55, 0.3)):
            Rectangle(SKETCH_20_W, SKETCH_20_H)
    extrude(amount=-CUT_EXTRUDE_10_DEPTH, mode=Mode.SUBTRACT)


with BuildPart() as body_2_2_1:
    # 草图6 → 凸台-拉伸4 (new body)
    with BuildSketch(Plane.XY.offset(0.2)):
        with Locations((0.7, 0.925)):
            Rectangle(SKETCH_6_W, SKETCH_6_H)
    extrude(amount=EXTRUDE_4_DEPTH)

    # 圆角2
    fillet_2_edges = [body_2_2_1.edges().sort_by_distance(p)[0] for p in [
        (0.45, 0.925, 0.4),
        (0.7, 0.45, 0.4),
        (0.95, 0.925, 0.4),
        (0.7, 1.4, 0.4),
    ]]
    fillet(fillet_2_edges, radius=FILLET_2_R)


with BuildPart() as body_3:
    # 草图6 → Extrude 4 2 (new body)
    with BuildSketch(Plane.XY.offset(0.2)):
        with Locations((3.75, 0.925)):
            Rectangle(SKETCH_6_W, SKETCH_6_H)
    extrude(amount=EXTRUDE_4_2_DEPTH)

    # 圆角3
    fillet_3_edges = [body_3.edges().sort_by_distance(p)[0] for p in [
        (3.5, 0.925, 0.4),
        (3.75, 0.45, 0.4),
        (4, 0.925, 0.4),
        (3.75, 1.4, 0.4),
    ]]
    fillet(fillet_3_edges, radius=FILLET_3_R)


solid = Compound([part_3.part, body_2_2_1.part, body_3.part])
